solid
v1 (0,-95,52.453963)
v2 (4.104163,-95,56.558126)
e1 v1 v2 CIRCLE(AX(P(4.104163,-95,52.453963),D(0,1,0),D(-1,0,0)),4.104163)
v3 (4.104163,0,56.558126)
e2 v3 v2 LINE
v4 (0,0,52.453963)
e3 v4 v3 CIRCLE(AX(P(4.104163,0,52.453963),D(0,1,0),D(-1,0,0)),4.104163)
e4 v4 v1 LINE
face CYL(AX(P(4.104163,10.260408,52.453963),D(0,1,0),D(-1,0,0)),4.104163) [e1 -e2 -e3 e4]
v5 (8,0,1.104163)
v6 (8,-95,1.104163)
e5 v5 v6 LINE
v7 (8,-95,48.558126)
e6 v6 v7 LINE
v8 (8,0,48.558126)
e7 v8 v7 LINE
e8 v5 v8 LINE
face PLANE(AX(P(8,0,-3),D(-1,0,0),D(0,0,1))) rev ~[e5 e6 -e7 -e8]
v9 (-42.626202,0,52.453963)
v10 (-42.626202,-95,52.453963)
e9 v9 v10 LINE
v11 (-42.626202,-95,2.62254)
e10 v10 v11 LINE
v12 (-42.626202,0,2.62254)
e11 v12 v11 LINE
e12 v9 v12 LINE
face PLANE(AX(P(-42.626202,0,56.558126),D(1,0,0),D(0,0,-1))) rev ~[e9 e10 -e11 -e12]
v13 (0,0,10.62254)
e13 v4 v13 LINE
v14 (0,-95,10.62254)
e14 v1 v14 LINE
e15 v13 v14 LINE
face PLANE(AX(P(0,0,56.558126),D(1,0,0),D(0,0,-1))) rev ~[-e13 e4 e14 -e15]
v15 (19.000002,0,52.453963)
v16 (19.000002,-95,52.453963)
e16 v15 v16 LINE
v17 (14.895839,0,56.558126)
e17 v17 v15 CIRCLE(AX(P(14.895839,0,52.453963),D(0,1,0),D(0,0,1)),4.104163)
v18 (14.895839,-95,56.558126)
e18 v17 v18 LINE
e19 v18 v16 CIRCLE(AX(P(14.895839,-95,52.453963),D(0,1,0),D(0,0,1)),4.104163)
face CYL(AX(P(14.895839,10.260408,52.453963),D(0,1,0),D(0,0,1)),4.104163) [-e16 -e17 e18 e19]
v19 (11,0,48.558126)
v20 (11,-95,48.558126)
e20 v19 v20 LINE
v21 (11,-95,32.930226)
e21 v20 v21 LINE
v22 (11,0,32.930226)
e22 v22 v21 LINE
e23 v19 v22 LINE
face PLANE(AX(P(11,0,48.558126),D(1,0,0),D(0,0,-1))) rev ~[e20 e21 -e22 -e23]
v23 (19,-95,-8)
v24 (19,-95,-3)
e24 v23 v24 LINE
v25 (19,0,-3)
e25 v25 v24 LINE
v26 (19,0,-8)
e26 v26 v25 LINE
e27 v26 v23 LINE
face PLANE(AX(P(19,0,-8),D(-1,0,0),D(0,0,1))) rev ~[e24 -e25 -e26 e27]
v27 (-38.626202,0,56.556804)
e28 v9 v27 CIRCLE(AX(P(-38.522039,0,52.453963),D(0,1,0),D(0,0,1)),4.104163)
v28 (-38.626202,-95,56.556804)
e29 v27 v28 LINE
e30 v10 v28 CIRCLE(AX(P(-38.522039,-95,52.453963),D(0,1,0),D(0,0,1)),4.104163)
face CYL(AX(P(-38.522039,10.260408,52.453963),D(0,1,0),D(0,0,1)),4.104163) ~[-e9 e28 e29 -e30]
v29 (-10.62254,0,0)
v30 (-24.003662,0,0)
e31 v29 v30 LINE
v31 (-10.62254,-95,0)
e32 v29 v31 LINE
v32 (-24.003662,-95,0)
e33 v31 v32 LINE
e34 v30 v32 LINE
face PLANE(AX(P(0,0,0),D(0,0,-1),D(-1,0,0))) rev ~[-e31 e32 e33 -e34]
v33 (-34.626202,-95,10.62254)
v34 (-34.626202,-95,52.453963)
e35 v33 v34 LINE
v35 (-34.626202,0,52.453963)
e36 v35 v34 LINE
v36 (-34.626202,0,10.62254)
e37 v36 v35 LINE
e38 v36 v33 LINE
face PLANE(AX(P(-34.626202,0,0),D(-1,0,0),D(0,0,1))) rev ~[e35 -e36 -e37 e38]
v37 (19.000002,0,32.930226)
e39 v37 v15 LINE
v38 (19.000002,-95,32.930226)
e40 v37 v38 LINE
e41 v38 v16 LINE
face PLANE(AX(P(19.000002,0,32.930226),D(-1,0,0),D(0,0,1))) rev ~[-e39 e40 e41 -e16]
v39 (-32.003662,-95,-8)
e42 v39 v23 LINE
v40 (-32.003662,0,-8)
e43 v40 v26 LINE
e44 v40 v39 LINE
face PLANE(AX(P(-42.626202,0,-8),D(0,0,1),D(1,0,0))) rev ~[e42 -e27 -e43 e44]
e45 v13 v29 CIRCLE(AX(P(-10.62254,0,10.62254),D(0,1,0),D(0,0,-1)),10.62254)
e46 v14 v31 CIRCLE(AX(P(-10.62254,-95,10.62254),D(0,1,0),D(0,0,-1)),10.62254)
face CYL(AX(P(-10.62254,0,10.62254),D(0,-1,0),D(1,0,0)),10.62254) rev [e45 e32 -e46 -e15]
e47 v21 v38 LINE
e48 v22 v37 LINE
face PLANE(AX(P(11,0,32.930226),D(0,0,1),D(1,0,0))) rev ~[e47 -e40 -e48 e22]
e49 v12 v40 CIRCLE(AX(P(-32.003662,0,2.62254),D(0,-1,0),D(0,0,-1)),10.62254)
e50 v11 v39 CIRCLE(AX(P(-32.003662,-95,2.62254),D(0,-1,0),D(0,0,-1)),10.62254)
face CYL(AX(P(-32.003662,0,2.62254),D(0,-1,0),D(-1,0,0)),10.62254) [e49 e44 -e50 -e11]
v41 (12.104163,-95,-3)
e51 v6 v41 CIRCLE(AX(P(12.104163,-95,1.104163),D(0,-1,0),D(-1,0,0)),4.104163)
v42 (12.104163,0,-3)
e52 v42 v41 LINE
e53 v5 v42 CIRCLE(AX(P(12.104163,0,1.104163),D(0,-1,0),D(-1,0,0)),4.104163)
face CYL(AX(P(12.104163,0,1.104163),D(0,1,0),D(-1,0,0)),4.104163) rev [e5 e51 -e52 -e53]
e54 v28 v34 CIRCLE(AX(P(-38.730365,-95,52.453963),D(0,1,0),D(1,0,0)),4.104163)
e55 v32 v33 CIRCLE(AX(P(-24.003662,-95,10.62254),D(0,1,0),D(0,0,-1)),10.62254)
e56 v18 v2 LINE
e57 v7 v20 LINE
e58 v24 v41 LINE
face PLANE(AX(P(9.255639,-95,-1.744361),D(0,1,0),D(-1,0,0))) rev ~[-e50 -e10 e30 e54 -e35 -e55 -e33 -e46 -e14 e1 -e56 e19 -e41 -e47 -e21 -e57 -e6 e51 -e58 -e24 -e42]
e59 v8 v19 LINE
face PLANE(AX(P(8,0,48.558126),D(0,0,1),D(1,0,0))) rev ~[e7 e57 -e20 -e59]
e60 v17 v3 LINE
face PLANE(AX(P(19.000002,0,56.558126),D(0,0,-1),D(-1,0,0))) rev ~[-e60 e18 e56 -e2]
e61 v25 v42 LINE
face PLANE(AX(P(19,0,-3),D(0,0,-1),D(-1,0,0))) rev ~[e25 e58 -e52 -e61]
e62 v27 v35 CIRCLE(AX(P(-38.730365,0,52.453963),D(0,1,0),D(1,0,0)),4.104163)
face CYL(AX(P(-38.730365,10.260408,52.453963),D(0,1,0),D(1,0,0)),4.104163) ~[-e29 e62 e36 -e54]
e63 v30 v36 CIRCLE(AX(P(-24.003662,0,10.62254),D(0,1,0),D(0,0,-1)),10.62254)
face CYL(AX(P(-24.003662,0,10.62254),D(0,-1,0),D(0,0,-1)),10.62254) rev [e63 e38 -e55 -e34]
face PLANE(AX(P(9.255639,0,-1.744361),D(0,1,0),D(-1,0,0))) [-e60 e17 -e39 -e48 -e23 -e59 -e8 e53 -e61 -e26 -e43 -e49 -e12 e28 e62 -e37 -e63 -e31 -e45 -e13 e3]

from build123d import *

# Parameters (mm, degrees)
F1_DEPTH    = 95
F2_T1_DEPTH = 95
F2_T3_DEPTH = 115.5208152802
F3_R        = 10.6225396744


# Not quite as in the source:
# - a fillet or chamfer that OpenCascade refuses, or shapes differently, is made with other operations: its cross-section is extruded or revolved along the edge and cut away or added


with BuildPart() as f1:
    # F0 (on Front) → F1 (new body)
    with BuildSketch(Plane.XZ):
        Polygon((0, 56.5581262502), (0, 0), (-34.6262017979, 0), (-34.6262017979, 56.5581262502), (-42.6262017979, 56.5581262502), (-42.6262017979, -8), (8, -8), (19, -8), (19, -3), (8, -3), (8, 48.5581262502), (11, 48.5581262502), (11, 32.9302263872), (19.0000018427, 32.9302263872), (19.0000018427, 56.5581262502), align=None)
    extrude(amount=F1_DEPTH)

    # F2: fillet of radius 4.104163056 on 5 edges, made by hand

    # F2_s2 → F2_t1 (join)
    with BuildSketch(Plane.XZ):
        with BuildLine():
            ThreePointArc((8, 1.104163056), (9.202081528, -1.797918472), (12.104163056, -3))
            Line((12.104163056, -3), (8, -3))
            Line((8, -3), (8, 1.104163056))
        make_face()
    extrude(amount=F2_T1_DEPTH)

    # F2_s4 → F2_t3 (cut)
    with BuildSketch(Plane.XZ.offset(-10.2604076401)):
        with BuildLine():
            ThreePointArc((-38.5220387419, 56.5581262502), (-41.4241202699, 55.3560447222), (-42.6262017979, 52.4539631941))
            Line((-42.6262017979, 52.4539631941), (-42.6262017979, 56.5581262502))
            Line((-42.6262017979, 56.5581262502), (-38.5220387419, 56.5581262502))
        make_face()
        with BuildLine():
            ThreePointArc((-34.6262017979, 52.4539631941), (-35.828283326, 55.3560447222), (-38.730364854, 56.5581262502))
            Line((-38.730364854, 56.5581262502), (-34.6262017979, 56.5581262502))
            Line((-34.6262017979, 56.5581262502), (-34.6262017979, 52.4539631941))
        make_face()
        with BuildLine():
            ThreePointArc((0, 52.4539631941), (1.202081528, 55.3560447222), (4.104163056, 56.5581262502))
            Line((4.104163056, 56.5581262502), (0, 56.5581262502))
            Line((0, 56.5581262502), (0, 52.4539631941))
        make_face()
        with BuildLine():
            ThreePointArc((14.8958387867, 56.5581262502), (17.7979203147, 55.3560447222), (19.0000018427, 52.4539631941))
            Line((19.0000018427, 52.4539631941), (19.0000018427, 56.5581262502))
            Line((19.0000018427, 56.5581262502), (14.8958387867, 56.5581262502))
        make_face()
    extrude(amount=F2_T3_DEPTH, mode=Mode.SUBTRACT)

    # F3
    f3_edges = [f1.edges().sort_by_distance(p)[0] for p in [
        (-34.626202, -47.5, 0),
        (0, -47.5, 0),
        (-42.626202, -47.5, -8),
    ]]
    fillet(f3_edges, radius=F3_R)


solid = f1.part
